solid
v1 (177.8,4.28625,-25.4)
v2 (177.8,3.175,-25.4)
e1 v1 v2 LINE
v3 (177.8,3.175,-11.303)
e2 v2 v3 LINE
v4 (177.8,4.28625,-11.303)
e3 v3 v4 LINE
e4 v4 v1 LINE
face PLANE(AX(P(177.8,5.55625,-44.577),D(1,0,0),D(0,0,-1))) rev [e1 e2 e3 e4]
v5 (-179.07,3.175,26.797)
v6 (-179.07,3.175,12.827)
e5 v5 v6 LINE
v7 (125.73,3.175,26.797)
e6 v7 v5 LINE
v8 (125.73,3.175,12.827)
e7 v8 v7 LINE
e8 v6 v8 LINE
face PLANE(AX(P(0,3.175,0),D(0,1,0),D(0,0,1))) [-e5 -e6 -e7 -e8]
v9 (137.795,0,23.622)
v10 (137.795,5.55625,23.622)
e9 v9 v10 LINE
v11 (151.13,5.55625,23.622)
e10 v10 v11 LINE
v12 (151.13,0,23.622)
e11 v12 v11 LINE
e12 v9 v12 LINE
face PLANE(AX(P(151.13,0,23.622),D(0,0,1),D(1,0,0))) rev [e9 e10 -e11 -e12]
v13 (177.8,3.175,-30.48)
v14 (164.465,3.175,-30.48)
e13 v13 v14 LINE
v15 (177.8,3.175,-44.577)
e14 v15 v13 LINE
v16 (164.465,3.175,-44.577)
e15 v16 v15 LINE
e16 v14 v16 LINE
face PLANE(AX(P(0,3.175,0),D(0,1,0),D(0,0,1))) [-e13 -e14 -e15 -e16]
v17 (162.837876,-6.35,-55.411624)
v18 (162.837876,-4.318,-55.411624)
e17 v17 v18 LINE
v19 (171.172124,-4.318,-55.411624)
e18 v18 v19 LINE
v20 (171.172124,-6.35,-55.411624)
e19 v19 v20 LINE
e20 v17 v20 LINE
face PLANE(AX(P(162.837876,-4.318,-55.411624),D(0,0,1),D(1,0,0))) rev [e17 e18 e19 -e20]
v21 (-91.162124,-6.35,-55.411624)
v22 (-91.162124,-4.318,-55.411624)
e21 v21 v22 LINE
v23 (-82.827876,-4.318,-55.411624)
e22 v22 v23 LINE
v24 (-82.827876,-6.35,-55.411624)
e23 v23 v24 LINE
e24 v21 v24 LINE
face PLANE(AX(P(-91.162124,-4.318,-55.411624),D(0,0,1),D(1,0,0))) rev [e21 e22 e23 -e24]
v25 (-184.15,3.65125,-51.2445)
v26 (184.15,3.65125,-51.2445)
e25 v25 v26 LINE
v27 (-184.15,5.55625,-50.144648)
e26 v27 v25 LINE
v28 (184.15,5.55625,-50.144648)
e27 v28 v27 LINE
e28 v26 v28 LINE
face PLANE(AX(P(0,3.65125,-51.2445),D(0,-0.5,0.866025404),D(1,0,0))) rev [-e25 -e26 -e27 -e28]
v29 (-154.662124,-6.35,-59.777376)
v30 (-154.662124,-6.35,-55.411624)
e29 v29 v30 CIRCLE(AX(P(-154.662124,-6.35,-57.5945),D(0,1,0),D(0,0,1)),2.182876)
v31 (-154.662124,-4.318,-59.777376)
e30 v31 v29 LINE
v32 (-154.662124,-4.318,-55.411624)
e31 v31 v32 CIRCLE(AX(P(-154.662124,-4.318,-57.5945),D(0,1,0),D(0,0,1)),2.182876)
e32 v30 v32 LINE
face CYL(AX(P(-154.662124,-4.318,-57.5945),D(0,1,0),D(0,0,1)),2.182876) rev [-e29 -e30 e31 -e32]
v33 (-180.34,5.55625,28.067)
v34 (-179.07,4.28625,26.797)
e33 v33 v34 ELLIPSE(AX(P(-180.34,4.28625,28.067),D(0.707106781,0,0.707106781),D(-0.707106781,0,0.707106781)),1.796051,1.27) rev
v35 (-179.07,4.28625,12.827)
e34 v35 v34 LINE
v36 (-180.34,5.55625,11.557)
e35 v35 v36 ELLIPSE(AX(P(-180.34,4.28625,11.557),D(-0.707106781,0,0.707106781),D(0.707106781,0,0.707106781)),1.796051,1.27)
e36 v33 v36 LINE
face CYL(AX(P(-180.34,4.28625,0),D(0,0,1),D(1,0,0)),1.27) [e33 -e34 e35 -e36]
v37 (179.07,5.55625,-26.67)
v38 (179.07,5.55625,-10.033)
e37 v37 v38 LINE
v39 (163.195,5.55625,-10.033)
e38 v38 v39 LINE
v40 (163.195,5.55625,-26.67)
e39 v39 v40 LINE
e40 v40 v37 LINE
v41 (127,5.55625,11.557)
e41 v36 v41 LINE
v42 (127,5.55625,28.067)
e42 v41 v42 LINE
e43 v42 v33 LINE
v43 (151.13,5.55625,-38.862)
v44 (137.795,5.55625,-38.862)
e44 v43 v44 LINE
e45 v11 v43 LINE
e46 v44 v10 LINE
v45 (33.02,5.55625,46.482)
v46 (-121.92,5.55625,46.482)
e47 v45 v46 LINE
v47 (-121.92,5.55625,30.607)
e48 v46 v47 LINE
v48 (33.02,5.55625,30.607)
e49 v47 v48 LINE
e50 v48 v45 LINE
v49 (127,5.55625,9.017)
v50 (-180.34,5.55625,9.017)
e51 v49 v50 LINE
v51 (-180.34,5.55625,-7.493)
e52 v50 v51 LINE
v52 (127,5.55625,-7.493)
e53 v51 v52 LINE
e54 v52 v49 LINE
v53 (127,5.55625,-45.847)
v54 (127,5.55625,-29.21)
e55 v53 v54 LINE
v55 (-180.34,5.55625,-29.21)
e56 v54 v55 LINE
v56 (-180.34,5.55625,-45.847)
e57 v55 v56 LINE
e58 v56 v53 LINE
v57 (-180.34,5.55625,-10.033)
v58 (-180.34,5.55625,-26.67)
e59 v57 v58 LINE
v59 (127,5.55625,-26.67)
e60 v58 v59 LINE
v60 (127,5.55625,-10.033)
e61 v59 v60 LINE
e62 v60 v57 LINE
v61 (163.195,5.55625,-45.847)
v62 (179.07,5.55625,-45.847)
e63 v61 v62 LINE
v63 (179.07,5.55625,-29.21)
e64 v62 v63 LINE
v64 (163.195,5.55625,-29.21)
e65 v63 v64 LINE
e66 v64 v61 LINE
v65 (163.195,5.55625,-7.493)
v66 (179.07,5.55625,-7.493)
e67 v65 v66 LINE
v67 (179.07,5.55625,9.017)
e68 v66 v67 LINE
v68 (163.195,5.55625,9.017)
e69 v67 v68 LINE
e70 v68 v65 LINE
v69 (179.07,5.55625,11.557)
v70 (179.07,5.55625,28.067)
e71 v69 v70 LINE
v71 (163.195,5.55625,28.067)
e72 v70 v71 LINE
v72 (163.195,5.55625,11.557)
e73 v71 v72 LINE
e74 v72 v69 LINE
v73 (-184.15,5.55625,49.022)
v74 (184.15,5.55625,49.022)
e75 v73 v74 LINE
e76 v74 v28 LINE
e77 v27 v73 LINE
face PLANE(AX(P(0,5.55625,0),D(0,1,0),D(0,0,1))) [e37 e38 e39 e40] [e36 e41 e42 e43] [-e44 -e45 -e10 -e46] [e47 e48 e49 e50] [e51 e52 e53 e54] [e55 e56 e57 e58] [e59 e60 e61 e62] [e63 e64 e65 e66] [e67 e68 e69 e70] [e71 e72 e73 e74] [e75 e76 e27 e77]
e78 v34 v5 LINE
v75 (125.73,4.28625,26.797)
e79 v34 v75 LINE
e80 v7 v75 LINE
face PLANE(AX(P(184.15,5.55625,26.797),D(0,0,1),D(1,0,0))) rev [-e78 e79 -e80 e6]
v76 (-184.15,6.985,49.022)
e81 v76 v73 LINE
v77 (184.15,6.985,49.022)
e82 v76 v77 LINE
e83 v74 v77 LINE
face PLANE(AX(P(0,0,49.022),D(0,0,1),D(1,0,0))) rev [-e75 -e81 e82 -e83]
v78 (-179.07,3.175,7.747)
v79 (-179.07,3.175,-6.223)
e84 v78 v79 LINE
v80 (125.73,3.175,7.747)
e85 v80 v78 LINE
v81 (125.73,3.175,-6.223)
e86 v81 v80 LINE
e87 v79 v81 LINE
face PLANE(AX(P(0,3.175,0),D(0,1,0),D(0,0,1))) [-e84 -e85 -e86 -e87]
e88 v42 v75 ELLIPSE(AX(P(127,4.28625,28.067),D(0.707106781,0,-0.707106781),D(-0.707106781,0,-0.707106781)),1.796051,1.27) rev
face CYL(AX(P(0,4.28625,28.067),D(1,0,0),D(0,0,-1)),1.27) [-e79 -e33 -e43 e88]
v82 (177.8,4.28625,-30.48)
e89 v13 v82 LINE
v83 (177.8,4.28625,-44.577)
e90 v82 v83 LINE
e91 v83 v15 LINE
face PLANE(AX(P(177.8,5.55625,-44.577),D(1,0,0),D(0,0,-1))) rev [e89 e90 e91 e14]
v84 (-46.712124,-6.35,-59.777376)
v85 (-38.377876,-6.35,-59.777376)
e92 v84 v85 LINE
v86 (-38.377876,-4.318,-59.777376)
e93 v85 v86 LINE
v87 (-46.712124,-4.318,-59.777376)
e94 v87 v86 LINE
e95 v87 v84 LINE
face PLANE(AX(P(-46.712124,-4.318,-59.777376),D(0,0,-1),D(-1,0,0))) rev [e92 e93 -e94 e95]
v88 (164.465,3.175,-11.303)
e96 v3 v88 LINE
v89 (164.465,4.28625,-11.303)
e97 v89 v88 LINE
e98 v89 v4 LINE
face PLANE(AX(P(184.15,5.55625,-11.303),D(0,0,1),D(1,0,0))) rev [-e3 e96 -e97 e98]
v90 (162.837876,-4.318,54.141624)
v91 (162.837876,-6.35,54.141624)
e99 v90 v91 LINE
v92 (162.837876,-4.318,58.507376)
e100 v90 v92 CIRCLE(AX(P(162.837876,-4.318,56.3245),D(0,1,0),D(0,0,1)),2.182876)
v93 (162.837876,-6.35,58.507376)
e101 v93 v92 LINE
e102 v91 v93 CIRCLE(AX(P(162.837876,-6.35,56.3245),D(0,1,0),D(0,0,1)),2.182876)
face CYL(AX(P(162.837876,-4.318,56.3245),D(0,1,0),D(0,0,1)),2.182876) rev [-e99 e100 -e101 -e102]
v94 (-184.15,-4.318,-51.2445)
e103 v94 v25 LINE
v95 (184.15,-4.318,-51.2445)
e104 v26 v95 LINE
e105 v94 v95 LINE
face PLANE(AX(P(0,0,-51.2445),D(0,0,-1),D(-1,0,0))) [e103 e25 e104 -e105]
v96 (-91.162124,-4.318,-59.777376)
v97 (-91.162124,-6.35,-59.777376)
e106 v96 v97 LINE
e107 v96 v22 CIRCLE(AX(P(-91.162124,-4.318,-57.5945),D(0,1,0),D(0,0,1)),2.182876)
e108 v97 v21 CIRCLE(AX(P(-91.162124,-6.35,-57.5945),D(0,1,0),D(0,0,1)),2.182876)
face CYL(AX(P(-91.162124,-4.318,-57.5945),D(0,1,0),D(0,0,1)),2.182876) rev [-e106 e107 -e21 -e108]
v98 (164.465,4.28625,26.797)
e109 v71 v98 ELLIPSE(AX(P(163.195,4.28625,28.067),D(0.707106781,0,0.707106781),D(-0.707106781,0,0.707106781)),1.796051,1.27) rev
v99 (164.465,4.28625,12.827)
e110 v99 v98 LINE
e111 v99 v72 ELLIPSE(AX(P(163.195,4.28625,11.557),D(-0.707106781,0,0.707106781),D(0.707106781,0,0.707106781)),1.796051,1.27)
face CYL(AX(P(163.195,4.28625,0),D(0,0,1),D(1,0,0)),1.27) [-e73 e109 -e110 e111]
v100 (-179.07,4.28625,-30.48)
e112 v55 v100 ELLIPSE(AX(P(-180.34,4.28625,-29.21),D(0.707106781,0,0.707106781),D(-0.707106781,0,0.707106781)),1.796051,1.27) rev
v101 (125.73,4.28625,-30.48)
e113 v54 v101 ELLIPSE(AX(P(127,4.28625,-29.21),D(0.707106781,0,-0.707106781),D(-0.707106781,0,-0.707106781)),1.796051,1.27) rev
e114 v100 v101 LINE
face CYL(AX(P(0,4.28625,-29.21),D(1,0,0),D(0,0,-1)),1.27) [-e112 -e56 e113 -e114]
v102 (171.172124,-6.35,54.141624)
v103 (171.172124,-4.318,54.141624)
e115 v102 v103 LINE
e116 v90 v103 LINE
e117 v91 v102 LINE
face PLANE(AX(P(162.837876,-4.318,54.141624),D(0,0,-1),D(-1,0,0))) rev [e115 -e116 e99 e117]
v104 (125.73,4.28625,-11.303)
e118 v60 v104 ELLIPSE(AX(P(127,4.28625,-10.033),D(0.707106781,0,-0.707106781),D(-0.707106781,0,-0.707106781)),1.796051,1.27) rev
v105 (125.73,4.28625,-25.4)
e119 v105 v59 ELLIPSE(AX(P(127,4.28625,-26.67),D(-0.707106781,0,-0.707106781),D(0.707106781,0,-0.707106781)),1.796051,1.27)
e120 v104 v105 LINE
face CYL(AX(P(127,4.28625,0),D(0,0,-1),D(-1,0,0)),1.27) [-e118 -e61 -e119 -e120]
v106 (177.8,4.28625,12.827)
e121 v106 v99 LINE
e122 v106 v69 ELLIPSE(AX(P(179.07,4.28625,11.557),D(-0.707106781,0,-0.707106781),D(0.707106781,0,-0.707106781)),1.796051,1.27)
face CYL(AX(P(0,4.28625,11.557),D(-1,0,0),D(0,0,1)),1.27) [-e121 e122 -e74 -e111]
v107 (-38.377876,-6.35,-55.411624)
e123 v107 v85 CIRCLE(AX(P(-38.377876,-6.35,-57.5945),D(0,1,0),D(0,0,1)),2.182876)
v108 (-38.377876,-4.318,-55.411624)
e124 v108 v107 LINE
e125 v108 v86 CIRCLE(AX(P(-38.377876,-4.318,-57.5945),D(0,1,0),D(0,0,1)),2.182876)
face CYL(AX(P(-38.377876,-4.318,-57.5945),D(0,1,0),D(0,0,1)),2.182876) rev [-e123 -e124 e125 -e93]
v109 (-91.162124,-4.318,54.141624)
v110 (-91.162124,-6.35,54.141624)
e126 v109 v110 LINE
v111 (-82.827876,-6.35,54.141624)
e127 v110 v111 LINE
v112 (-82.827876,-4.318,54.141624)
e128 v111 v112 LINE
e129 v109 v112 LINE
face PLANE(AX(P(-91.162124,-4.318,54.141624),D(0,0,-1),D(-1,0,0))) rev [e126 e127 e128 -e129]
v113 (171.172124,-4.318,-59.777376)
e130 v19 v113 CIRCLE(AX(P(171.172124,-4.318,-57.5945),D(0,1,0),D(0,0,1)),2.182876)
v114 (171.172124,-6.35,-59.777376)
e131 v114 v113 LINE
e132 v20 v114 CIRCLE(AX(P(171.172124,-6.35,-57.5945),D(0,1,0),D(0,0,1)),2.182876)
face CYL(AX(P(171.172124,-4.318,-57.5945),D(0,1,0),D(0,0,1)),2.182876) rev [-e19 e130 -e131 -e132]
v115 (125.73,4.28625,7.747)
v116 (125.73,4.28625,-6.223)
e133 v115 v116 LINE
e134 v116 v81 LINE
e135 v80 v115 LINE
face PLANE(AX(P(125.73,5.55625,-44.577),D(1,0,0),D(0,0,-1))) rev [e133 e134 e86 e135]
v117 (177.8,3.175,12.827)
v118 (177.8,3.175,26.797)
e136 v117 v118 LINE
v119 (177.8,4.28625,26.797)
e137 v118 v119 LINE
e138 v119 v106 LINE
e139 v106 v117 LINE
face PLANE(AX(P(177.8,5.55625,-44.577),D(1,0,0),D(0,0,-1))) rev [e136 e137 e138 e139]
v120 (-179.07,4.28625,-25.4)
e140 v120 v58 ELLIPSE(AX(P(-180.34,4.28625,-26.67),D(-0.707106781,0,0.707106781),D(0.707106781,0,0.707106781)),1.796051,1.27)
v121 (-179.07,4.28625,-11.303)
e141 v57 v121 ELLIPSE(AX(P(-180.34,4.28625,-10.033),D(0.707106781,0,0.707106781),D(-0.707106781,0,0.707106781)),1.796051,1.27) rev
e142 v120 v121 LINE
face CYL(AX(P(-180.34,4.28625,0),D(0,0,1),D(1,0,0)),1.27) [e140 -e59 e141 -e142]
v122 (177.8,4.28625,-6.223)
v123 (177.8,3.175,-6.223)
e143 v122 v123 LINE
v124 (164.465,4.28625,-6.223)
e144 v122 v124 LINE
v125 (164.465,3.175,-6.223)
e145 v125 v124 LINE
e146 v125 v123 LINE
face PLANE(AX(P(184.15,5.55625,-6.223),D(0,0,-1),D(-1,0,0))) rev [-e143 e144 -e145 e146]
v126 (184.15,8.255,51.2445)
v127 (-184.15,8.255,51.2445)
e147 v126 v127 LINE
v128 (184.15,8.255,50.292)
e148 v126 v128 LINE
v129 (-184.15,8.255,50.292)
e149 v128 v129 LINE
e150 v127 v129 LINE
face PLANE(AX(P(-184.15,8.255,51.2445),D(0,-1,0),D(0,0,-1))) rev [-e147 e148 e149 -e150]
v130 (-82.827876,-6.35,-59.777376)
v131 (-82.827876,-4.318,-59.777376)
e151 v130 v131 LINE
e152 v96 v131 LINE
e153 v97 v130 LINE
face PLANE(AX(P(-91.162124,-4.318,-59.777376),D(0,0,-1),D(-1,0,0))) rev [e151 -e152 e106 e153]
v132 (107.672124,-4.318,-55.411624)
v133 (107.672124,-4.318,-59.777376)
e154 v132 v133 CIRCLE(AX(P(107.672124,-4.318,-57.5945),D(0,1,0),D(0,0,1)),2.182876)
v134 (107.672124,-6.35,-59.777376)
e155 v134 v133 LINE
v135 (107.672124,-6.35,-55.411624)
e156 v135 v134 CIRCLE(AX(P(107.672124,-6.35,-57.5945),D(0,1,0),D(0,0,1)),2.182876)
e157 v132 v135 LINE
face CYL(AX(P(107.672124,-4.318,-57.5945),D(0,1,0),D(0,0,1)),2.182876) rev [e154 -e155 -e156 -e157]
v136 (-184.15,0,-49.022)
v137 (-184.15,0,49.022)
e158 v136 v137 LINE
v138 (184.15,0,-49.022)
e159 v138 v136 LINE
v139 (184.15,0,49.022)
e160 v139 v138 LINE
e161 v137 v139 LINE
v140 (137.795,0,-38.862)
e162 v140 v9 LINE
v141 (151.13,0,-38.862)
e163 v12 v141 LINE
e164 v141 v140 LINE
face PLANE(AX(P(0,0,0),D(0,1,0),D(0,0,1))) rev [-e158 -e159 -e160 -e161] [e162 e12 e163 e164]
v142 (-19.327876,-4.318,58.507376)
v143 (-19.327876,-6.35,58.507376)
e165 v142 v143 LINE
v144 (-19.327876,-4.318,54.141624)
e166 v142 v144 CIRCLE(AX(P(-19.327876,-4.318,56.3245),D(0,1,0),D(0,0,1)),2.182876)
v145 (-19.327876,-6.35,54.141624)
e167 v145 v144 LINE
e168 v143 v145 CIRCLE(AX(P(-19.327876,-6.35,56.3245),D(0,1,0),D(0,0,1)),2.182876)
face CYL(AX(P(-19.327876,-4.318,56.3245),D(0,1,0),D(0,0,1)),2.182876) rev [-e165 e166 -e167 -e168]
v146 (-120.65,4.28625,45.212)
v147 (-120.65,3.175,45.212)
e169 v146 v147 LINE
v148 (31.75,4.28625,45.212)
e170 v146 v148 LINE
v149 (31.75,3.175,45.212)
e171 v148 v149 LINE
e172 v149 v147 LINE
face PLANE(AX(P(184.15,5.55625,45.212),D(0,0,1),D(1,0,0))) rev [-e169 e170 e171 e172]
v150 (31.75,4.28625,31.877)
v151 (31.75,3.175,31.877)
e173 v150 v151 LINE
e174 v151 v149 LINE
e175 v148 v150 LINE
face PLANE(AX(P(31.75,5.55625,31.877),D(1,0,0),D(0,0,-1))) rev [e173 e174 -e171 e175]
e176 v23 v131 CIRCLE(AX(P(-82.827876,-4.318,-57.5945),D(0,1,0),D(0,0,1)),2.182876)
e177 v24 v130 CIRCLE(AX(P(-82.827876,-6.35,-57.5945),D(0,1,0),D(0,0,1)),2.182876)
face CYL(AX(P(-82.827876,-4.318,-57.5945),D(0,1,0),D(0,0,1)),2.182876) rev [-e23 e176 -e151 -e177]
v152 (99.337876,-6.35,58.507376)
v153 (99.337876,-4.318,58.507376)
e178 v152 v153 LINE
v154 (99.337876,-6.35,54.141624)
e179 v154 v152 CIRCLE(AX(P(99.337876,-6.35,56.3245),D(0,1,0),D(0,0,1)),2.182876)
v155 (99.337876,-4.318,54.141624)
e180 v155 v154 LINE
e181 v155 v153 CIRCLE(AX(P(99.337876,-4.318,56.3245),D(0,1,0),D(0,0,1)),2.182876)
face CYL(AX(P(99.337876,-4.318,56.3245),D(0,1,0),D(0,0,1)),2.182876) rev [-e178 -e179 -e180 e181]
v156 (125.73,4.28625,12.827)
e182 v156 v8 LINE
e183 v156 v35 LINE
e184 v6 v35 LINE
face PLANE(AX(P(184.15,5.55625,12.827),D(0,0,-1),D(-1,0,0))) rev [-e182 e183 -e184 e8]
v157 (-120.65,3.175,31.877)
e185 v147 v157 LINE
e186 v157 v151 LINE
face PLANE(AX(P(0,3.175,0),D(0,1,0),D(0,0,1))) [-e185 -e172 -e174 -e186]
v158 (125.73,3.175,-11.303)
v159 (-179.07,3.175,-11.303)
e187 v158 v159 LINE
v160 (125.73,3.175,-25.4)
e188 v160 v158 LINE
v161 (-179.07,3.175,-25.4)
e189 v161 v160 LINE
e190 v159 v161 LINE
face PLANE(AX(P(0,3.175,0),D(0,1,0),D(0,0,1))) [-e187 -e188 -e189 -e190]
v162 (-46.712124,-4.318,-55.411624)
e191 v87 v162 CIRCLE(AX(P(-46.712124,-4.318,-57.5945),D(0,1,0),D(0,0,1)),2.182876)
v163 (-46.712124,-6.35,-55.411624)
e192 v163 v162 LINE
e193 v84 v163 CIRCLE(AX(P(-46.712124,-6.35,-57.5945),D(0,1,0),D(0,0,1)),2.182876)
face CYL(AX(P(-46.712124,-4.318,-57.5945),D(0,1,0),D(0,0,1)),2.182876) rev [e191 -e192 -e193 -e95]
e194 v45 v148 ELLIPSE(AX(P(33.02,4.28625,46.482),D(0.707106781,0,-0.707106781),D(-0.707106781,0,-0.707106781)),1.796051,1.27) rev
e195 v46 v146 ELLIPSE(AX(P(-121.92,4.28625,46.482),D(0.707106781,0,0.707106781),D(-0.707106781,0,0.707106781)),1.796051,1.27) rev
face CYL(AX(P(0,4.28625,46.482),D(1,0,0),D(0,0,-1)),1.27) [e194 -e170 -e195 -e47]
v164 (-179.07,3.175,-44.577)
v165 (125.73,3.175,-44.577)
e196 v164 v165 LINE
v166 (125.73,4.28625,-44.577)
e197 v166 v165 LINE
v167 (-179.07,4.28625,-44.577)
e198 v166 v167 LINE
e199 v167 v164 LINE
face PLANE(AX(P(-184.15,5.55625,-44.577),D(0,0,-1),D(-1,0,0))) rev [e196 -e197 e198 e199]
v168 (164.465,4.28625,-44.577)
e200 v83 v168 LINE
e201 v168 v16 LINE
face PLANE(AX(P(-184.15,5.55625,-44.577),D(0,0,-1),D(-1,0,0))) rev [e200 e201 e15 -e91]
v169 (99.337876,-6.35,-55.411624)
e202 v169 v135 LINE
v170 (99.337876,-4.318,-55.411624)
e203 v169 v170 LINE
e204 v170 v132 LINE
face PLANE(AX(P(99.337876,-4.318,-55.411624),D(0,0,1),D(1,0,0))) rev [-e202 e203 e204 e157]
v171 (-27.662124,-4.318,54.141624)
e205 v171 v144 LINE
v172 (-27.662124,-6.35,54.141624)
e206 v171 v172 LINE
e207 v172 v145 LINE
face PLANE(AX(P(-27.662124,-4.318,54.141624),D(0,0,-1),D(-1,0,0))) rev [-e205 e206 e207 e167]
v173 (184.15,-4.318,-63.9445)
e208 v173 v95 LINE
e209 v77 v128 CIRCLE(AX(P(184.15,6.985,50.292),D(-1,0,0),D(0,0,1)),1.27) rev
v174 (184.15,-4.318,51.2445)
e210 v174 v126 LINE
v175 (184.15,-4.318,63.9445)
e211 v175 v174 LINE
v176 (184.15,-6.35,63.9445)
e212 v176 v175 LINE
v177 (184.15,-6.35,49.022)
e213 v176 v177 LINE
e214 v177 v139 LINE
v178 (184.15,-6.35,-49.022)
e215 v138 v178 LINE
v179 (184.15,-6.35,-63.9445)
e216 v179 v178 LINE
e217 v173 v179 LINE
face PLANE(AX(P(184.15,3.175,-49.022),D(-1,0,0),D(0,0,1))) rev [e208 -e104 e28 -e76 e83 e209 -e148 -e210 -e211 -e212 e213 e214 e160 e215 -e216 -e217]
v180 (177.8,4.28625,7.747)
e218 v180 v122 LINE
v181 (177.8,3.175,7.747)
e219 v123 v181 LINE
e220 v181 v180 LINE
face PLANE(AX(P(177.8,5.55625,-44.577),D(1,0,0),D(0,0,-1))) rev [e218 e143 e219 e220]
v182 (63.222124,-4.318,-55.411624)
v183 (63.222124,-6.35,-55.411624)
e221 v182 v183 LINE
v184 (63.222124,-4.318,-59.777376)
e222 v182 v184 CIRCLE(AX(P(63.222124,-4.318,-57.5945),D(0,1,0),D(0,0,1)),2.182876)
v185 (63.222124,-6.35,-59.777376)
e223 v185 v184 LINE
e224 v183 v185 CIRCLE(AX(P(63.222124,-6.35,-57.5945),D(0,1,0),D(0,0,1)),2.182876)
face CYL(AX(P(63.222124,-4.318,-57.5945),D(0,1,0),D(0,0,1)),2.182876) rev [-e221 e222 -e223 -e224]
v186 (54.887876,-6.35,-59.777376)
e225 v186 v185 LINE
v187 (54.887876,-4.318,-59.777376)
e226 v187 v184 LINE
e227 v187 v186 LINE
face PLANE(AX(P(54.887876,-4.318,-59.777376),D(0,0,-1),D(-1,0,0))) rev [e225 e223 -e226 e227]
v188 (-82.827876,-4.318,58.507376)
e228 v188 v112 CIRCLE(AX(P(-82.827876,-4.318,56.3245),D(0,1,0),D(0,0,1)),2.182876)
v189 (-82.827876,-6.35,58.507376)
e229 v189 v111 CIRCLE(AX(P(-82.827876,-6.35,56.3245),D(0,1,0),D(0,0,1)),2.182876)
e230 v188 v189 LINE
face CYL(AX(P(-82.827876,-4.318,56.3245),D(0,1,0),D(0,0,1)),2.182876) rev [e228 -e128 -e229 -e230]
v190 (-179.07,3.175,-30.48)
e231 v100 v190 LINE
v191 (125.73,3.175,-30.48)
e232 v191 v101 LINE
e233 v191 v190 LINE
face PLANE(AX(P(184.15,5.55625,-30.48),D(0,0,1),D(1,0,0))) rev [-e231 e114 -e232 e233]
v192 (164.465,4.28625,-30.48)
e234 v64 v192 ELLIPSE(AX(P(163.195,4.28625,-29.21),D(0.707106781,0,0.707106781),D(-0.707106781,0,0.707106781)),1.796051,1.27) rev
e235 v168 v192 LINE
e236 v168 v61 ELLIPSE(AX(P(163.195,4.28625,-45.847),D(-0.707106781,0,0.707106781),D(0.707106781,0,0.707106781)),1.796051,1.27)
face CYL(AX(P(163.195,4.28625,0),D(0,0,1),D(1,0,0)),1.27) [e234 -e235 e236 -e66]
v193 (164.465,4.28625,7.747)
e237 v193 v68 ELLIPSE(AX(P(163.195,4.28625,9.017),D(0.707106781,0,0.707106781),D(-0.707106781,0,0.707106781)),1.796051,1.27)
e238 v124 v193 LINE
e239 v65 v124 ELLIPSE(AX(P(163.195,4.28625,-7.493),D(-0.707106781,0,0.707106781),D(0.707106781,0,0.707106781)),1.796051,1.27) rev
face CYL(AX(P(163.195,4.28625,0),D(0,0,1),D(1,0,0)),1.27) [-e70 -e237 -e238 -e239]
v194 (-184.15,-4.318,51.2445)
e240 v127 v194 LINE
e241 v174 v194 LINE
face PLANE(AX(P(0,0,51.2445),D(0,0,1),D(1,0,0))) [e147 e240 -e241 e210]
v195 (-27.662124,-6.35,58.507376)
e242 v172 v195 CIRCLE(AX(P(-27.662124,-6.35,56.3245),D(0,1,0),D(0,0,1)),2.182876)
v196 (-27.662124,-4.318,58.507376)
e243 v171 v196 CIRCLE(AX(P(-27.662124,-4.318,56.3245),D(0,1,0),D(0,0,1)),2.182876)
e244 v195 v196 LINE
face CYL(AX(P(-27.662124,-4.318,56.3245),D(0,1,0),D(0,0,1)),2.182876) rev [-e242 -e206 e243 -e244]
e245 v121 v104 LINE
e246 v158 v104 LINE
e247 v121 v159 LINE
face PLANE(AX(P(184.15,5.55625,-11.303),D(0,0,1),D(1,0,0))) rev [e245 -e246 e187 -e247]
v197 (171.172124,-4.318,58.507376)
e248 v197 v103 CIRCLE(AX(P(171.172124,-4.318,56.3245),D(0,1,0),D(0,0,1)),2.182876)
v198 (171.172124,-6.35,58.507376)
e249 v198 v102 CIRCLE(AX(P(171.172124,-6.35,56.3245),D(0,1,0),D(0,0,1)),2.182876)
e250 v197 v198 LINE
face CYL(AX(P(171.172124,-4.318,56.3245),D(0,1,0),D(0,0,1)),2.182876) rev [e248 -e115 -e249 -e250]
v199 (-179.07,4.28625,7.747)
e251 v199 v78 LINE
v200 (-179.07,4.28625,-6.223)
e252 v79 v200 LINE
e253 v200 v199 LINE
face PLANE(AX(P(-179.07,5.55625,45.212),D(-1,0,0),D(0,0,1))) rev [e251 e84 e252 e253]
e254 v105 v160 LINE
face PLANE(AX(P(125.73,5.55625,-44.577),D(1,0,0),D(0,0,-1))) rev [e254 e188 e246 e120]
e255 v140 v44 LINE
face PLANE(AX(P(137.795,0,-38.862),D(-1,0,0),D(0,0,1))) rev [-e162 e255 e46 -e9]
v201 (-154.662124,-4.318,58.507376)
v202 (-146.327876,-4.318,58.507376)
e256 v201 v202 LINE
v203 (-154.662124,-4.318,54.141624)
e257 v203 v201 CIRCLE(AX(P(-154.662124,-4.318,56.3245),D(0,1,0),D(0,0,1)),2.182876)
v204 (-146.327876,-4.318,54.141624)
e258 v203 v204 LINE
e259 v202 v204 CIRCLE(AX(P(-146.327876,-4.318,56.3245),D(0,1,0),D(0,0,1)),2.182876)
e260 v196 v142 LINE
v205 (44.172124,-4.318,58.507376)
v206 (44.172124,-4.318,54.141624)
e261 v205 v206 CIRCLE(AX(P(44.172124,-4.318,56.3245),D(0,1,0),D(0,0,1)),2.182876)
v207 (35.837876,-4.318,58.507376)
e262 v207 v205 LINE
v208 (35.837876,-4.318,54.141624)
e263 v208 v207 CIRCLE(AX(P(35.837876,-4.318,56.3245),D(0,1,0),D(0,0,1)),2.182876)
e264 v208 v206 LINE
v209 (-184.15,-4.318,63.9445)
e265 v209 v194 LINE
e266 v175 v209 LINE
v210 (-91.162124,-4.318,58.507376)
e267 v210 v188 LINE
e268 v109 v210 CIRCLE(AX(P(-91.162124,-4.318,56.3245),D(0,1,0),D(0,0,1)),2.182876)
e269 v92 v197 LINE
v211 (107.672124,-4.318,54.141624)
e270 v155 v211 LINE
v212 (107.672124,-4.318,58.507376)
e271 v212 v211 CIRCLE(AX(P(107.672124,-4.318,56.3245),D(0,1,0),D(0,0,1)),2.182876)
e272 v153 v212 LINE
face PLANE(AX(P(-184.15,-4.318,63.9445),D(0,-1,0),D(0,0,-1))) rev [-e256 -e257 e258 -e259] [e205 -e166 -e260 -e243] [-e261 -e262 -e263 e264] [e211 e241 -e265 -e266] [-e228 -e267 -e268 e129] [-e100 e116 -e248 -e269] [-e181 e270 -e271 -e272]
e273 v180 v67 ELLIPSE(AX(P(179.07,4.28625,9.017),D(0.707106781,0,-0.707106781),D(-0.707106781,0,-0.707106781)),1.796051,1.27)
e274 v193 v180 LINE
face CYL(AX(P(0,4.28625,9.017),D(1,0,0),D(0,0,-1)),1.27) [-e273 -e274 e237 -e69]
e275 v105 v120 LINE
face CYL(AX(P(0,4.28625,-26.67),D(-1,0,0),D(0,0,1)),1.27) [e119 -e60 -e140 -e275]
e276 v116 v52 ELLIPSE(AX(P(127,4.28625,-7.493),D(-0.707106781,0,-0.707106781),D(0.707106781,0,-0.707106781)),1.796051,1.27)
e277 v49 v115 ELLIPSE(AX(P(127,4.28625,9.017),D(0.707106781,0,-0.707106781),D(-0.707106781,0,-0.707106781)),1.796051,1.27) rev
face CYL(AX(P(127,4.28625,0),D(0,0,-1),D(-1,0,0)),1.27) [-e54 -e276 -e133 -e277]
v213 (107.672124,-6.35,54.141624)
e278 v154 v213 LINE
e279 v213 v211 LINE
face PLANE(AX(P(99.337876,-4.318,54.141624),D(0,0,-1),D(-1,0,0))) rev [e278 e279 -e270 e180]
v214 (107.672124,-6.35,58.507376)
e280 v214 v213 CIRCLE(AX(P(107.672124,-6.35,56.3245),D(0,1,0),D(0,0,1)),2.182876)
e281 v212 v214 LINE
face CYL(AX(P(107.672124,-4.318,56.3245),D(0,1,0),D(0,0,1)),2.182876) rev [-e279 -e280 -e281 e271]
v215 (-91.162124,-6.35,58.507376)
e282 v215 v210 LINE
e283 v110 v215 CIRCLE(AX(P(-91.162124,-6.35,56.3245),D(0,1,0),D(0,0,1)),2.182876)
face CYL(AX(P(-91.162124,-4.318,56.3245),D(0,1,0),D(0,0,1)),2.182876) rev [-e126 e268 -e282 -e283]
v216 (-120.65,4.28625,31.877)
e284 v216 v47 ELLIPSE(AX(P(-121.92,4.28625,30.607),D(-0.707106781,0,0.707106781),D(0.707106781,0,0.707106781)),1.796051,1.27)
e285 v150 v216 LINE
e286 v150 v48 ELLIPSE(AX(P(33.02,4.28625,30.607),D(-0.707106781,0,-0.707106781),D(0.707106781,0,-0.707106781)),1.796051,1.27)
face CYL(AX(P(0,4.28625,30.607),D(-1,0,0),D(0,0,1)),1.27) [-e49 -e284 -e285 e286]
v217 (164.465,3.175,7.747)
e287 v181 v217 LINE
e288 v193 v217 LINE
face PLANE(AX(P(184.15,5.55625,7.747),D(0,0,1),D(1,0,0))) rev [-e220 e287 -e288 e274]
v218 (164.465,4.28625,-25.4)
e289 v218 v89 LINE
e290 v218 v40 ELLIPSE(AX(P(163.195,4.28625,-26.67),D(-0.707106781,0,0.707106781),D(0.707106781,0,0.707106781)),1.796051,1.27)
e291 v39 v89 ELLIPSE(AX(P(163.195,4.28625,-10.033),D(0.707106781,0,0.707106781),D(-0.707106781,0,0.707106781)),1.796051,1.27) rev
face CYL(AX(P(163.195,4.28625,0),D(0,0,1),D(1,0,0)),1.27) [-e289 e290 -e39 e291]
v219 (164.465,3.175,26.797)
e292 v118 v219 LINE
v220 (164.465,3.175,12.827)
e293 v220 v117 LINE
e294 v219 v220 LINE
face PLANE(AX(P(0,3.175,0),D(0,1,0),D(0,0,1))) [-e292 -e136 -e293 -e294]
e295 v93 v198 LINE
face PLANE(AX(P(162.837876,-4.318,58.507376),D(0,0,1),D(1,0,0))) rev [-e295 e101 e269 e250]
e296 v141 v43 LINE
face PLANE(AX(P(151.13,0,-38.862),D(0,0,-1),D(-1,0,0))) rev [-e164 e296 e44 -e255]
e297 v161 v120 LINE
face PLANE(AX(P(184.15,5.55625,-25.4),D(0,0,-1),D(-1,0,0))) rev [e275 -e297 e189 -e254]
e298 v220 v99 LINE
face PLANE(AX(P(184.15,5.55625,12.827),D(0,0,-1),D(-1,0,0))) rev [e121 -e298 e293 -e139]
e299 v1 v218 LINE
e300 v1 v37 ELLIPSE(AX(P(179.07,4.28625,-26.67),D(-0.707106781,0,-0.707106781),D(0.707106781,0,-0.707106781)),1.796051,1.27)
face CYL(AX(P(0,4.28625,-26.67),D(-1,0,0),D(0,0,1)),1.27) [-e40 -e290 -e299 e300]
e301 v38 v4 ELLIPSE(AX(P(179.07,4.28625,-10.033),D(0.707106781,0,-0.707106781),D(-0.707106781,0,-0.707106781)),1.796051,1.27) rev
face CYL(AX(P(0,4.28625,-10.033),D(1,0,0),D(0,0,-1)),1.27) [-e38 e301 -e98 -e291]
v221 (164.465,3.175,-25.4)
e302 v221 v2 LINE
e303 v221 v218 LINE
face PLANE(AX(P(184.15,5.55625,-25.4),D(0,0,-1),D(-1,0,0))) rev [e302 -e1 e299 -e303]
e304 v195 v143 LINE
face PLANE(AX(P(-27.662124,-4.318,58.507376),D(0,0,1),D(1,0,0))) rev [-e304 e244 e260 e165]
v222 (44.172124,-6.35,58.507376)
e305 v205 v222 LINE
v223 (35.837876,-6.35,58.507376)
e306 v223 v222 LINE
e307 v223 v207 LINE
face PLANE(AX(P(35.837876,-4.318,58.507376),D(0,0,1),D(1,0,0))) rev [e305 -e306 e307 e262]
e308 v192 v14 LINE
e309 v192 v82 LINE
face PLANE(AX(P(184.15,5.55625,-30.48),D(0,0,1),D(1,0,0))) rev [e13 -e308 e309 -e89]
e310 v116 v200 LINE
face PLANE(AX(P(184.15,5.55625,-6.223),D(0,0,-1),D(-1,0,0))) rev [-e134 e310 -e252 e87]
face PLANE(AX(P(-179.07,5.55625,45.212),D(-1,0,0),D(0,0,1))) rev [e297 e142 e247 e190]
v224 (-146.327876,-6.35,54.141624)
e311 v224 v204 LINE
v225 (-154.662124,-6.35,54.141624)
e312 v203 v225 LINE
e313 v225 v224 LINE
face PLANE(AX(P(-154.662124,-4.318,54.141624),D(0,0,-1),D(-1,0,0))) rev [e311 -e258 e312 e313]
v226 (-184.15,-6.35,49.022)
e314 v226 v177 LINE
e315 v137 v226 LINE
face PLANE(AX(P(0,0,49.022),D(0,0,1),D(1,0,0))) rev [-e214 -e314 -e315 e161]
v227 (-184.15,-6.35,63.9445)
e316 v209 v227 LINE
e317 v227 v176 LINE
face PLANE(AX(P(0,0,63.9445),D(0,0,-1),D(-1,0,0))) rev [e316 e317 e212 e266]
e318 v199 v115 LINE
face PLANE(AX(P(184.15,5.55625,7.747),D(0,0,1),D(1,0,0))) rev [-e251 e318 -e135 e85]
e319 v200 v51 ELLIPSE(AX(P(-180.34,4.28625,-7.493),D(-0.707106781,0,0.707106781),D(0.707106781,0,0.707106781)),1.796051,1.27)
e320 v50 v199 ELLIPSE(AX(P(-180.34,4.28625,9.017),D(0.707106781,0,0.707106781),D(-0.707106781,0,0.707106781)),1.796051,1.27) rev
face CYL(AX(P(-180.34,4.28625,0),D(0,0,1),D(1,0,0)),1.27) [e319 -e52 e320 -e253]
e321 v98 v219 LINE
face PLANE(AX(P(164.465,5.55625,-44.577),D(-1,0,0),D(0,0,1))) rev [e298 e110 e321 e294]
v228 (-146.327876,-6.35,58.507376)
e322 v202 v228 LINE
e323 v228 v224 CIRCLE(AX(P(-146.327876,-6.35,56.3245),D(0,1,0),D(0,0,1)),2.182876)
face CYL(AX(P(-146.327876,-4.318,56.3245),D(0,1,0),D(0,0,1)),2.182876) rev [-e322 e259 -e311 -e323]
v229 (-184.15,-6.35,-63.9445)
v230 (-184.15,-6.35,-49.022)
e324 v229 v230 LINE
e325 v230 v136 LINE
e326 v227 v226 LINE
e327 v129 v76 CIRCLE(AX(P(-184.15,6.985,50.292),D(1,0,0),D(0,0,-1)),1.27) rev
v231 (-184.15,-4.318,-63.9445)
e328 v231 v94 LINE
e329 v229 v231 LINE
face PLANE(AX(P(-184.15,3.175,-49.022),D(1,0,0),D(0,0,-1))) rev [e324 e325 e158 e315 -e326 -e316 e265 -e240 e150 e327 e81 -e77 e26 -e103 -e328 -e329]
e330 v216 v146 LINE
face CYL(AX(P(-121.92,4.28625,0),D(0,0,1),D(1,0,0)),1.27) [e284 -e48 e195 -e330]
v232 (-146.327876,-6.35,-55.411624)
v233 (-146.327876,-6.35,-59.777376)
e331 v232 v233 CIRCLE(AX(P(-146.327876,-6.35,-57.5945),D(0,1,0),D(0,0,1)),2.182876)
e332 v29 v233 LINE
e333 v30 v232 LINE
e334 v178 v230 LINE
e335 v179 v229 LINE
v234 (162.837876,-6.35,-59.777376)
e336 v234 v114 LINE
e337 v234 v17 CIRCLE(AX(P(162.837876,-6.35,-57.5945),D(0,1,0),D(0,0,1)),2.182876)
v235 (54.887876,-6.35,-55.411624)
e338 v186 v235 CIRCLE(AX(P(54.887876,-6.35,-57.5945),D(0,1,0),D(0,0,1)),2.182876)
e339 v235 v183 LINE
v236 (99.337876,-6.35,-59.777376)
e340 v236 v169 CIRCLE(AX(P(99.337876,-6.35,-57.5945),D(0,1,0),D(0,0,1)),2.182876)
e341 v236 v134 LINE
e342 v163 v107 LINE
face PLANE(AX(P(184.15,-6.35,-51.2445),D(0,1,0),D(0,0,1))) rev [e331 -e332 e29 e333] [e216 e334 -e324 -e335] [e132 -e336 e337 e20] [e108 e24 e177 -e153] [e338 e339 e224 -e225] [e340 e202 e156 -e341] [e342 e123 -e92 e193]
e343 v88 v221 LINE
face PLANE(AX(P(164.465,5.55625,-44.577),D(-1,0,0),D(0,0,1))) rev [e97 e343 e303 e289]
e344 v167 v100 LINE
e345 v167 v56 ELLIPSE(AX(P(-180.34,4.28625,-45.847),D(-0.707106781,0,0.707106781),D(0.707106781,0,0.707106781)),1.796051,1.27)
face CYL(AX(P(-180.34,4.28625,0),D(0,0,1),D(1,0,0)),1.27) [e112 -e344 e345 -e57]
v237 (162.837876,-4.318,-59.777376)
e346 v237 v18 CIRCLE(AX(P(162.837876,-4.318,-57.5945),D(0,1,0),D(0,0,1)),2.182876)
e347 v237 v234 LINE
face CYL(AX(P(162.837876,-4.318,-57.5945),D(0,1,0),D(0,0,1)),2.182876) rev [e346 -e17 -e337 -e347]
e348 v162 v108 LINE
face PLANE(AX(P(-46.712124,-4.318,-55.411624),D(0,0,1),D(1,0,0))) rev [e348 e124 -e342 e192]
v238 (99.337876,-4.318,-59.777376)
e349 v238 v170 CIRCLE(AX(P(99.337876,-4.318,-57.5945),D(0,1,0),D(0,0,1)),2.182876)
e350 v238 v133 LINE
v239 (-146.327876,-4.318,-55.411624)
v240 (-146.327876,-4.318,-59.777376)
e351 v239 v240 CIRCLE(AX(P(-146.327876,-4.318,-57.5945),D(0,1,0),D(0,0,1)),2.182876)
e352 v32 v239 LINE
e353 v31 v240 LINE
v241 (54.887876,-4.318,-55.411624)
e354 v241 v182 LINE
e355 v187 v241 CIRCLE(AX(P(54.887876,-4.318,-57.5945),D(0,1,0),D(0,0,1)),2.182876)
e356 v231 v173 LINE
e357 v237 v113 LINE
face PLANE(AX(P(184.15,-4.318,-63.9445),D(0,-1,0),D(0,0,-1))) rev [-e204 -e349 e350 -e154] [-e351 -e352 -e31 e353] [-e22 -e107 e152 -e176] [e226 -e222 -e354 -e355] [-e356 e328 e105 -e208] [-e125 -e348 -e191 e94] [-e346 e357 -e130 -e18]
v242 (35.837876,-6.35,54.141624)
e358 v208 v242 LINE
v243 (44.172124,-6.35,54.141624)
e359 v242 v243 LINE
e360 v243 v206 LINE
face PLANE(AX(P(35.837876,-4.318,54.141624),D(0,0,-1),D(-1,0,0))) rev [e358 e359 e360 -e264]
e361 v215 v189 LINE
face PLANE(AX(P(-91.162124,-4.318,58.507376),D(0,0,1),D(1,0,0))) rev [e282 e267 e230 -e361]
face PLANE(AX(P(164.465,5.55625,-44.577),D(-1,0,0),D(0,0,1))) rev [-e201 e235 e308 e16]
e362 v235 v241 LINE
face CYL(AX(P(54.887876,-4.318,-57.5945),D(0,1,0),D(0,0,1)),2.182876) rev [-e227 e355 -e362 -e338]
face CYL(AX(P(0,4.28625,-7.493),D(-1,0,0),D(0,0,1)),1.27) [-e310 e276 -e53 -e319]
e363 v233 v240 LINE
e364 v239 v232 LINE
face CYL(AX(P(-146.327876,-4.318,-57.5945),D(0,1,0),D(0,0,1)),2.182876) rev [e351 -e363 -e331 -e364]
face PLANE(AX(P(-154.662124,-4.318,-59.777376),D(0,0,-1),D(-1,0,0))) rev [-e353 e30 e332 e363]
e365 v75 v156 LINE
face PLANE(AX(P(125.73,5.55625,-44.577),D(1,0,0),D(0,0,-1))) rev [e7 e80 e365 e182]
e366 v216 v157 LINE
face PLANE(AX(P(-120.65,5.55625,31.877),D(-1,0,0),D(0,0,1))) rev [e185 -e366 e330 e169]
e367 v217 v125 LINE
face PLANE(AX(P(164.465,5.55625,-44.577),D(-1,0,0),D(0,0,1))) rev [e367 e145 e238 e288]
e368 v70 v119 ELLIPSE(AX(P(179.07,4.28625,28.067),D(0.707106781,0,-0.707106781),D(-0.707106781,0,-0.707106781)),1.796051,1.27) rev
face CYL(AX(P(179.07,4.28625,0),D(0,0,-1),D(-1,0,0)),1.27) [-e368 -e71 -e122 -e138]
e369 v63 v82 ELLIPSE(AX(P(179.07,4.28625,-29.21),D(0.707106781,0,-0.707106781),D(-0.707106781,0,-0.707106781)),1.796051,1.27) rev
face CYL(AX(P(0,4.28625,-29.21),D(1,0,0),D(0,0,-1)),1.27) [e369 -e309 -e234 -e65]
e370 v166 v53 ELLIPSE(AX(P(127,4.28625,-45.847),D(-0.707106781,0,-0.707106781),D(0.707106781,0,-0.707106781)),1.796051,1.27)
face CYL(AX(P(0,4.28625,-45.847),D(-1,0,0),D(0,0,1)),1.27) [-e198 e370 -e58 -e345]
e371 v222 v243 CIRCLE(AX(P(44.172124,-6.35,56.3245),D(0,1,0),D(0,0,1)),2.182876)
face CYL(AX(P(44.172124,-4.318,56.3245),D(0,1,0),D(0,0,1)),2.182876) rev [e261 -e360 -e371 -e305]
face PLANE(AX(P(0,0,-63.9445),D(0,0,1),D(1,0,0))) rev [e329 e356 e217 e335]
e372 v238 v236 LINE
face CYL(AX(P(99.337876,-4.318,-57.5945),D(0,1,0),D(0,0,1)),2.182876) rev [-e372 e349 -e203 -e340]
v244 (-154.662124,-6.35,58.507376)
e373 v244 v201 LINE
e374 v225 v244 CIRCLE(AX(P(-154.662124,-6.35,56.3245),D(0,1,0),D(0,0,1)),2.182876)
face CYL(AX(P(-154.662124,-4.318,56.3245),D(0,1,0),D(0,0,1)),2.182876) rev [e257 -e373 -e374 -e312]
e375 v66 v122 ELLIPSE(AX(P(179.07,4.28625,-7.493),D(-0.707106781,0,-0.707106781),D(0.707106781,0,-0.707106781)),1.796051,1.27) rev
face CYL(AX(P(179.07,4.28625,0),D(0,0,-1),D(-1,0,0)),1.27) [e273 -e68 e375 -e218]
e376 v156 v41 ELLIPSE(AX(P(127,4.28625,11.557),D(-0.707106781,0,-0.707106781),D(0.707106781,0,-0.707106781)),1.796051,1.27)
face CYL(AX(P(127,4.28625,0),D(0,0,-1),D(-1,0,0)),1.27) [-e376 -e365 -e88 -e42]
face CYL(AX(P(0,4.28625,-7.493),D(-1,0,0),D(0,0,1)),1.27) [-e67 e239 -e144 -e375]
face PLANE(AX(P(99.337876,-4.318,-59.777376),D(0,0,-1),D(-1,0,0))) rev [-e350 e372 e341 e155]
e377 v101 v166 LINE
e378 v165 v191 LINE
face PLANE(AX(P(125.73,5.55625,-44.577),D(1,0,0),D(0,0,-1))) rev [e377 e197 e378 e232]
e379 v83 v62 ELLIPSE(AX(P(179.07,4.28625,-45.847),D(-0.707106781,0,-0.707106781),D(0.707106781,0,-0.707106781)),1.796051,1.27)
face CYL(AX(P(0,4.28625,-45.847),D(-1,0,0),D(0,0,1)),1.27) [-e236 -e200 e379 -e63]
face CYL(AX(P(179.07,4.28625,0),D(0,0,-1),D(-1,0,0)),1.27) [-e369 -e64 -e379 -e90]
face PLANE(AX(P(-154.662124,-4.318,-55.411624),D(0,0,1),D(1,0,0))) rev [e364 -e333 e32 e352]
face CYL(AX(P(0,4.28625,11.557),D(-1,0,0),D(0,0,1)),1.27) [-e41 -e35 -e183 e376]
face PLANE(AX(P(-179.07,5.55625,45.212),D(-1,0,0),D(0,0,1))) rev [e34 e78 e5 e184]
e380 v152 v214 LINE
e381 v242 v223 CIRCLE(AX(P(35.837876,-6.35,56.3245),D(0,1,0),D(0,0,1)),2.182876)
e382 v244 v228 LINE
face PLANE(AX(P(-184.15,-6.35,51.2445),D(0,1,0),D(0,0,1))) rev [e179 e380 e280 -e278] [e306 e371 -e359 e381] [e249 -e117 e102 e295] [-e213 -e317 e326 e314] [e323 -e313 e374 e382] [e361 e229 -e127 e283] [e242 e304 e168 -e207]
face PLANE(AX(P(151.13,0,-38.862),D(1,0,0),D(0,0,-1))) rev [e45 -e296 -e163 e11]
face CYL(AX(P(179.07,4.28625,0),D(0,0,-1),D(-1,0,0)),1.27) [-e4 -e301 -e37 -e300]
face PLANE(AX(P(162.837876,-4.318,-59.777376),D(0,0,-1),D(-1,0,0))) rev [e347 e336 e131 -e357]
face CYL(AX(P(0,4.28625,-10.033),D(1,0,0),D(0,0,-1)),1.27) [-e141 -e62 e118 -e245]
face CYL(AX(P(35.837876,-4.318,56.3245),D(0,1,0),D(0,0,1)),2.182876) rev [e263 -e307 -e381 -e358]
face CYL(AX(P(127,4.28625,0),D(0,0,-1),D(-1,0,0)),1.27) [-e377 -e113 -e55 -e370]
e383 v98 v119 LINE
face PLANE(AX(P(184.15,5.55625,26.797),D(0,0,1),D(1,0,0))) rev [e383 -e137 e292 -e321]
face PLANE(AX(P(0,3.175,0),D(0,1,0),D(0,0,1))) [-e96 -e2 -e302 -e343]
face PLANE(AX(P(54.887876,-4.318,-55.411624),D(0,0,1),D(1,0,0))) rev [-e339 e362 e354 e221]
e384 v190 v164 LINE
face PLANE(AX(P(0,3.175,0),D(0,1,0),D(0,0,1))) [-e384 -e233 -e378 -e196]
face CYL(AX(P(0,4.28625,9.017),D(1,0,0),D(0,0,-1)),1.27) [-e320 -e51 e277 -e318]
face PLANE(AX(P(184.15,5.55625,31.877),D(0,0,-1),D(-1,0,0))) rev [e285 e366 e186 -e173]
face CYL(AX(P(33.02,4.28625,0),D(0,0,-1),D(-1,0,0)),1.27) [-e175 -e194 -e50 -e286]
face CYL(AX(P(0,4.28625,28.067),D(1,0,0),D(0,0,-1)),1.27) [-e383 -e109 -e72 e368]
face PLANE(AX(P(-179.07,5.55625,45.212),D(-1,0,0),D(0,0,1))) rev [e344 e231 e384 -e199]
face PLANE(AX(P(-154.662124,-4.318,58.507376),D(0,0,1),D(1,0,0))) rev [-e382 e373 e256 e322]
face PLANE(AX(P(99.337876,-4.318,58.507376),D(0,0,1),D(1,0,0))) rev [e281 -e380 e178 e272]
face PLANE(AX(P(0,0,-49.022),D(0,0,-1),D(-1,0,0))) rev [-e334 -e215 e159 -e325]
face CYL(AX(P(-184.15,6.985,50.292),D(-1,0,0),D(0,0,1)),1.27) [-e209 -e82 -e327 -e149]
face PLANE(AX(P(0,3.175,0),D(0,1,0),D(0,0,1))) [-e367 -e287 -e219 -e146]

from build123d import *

# Parameters (mm, degrees)
SKETCH1_W                            = 368.3
SKETCH1_H                            = 98.044
BOSS_EXTRUDE1_DEPTH                  = 3.175
SKETCH2_W                            = 368.3
SKETCH2_H                            = 4.445
BOSS_EXTRUDE2_DEPTH                  = 2.38125
SKETCH3_W                            = 368.3
SKETCH3_H                            = 3.81
BOSS_EXTRUDE3_DEPTH                  = 2.38125
SKETCH4_W                            = 368.3
SKETCH4_H                            = 5.08
BOSS_EXTRUDE4_DEPTH                  = 2.38125
SKETCH5_W                            = 368.3
SKETCH5_H                            = 5.08
BOSS_EXTRUDE5_DEPTH                  = 2.38125
SKETCH7_W                            = 368.3
SKETCH7_H                            = 5.08
BOSS_EXTRUDE6_DEPTH                  = 2.38125
SKETCH9_W                            = 368.3
SKETCH9_H                            = 5.08
BOSS_EXTRUDE7_DEPTH                  = 2.38125
SKETCH10_W                           = 6.35
SKETCH10_H                           = 89.789
BOSS_EXTRUDE8_DEPTH                  = 2.38125
SKETCH11_W                           = 5.08
SKETCH11_H                           = 89.789
BOSS_EXTRUDE9_DEPTH                  = 2.38125
SKETCH12_W                           = 13.97
SKETCH12_H                           = 89.789
BOSS_EXTRUDE10_DEPTH                 = 2.38125
SKETCH13_W                           = 12.7
SKETCH13_H                           = 89.789
BOSS_EXTRUDE11_DEPTH                 = 2.38125
SKETCH14_W                           = 13.335
SKETCH14_H                           = 62.484
CUT_EXTRUDE1_DEPTH                   = 191.644304657
SKETCH15_W                           = 12.065
SKETCH15_H                           = 13.335
BOSS_EXTRUDE12_DEPTH                 = 2.38125
SKETCH16_W                           = 12.065
SKETCH16_H                           = 3.175
BOSS_EXTRUDE13_DEPTH                 = 2.38125
SKETCH17_W                           = 12.065
SKETCH17_H                           = 5.715
BOSS_EXTRUDE14_DEPTH                 = 2.38125
SKETCH18_W                           = 13.335
SKETCH18_H                           = 13.335
BOSS_EXTRUDE15_DEPTH                 = 2.38125
SKETCH19_W                           = 58.42
SKETCH19_H                           = 13.335
BOSS_EXTRUDE16_DEPTH                 = 2.38125
SKETCH20_W                           = 93.98
SKETCH20_H                           = 13.335
BOSS_EXTRUDE17_DEPTH                 = 2.38125
SKETCH22_W                           = 368.3
SKETCH22_H                           = 14.605
BOSS_EXTRUDE18_DEPTH                 = 2.2225
SKETCH23_W                           = 368.3
SKETCH23_H                           = 2.032
BOSS_EXTRUDE19_DEPTH                 = 12.7
SKETCH24_W                           = 368.3
SKETCH24_H                           = 11.90625
BOSS_EXTRUDE20_DEPTH                 = 2.2225
SKETCH25_W                           = 368.3
SKETCH25_H                           = 2.032
BOSS_EXTRUDE21_DEPTH                 = 12.7
F_11_64_START                        = -6.35
F_11_64_0_17188_DIAMETER_SLOT1_DEPTH = 2.032
FILLET2_R                            = 1.27
CHAMFER1_SIZE                        = 1.905
CHAMFER1_SIZE2                       = 1.099852263


# Read off the part's stored shape, not the designer's step: 11/64 (0.17188) Diameter Slot1
with BuildPart() as part:
    # Sketch1 → Boss-Extrude1 (new body)
    with BuildSketch(Plane(origin=(0, 0, 0), x_dir=(1, 0, 0), z_dir=(0, 1, 0))):
        Rectangle(SKETCH1_W, SKETCH1_H)
    extrude(amount=BOSS_EXTRUDE1_DEPTH)

    # Sketch2 → Boss-Extrude2 (add)
    with BuildSketch(Plane(origin=(0, 3.175, 0), x_dir=(1, 0, 0), z_dir=(0, 1, 0))):
        with Locations((0, 46.7995)):
            Rectangle(SKETCH2_W, SKETCH2_H)
    extrude(amount=BOSS_EXTRUDE2_DEPTH)

    # Sketch3 → Boss-Extrude3 (add)
    with BuildSketch(Plane(origin=(0, 3.175, 0), x_dir=(1, 0, 0), z_dir=(0, 1, 0))):
        with Locations((0, -47.117)):
            Rectangle(SKETCH3_W, SKETCH3_H)
    extrude(amount=BOSS_EXTRUDE3_DEPTH)

    # Sketch4 → Boss-Extrude4 (add)
    with BuildSketch(Plane(origin=(0, 3.175, 0), x_dir=(1, 0, 0), z_dir=(0, 1, 0))):
        with Locations((0, -29.337)):
            Rectangle(SKETCH4_W, SKETCH4_H)
    extrude(amount=BOSS_EXTRUDE4_DEPTH)

    # Sketch5 → Boss-Extrude5 (add)
    with BuildSketch(Plane(origin=(0, 3.175, 0), x_dir=(1, 0, 0), z_dir=(0, 1, 0))):
        with Locations((0, -10.287)):
            Rectangle(SKETCH5_W, SKETCH5_H)
    extrude(amount=BOSS_EXTRUDE5_DEPTH)

    # Sketch7 → Boss-Extrude6 (add)
    with BuildSketch(Plane(origin=(0, 3.175, 0), x_dir=(1, 0, 0), z_dir=(0, 1, 0))):
        with Locations((0, 8.763)):
            Rectangle(SKETCH7_W, SKETCH7_H)
    extrude(amount=BOSS_EXTRUDE6_DEPTH)

    # Sketch9 → Boss-Extrude7 (add)
    with BuildSketch(Plane(origin=(0, 3.175, 0), x_dir=(1, 0, 0), z_dir=(0, 1, 0))):
        with Locations((0, 27.94)):
            Rectangle(SKETCH9_W, SKETCH9_H)
    extrude(amount=BOSS_EXTRUDE7_DEPTH)

    # Sketch10 → Boss-Extrude8 (add)
    with BuildSketch(Plane(origin=(0, 3.175, 0), x_dir=(1, 0, 0), z_dir=(0, 1, 0))):
        with Locations((180.975, -0.3175)):
            Rectangle(SKETCH10_W, SKETCH10_H)
    extrude(amount=BOSS_EXTRUDE8_DEPTH)

    # Sketch11 → Boss-Extrude9 (add)
    with BuildSketch(Plane(origin=(0, 3.175, 0), x_dir=(1, 0, 0), z_dir=(0, 1, 0))):
        with Locations((-181.61, -0.3175)):
            Rectangle(SKETCH11_W, SKETCH11_H)
    extrude(amount=BOSS_EXTRUDE9_DEPTH)

    # Sketch12 → Boss-Extrude10 (add)
    with BuildSketch(Plane(origin=(0, 3.175, 0), x_dir=(1, 0, 0), z_dir=(0, 1, 0))):
        with Locations((157.48, -0.3175)):
            Rectangle(SKETCH12_W, SKETCH12_H)
    extrude(amount=BOSS_EXTRUDE10_DEPTH)

    # Sketch13 → Boss-Extrude11 (add)
    with BuildSketch(Plane(origin=(0, 3.175, 0), x_dir=(1, 0, 0), z_dir=(0, 1, 0))):
        with Locations((132.08, -0.3175)):
            Rectangle(SKETCH13_W, SKETCH13_H)
    extrude(amount=BOSS_EXTRUDE11_DEPTH)

    # Sketch14 → Cut-Extrude1 (cut, through all)
    with BuildSketch(Plane(origin=(0, 5.55625, 0), x_dir=(1, 0, 0), z_dir=(0, 1, 0))):
        with Locations((144.4625, 7.62)):
            Rectangle(SKETCH14_W, SKETCH14_H)
    extrude(amount=-CUT_EXTRUDE1_DEPTH, mode=Mode.SUBTRACT)

    # Sketch15 → Boss-Extrude12 (add)
    with BuildSketch(Plane(origin=(0, 3.175, 0), x_dir=(1, 0, 0), z_dir=(0, 1, 0))):
        with Locations((144.4625, -38.5445)):
            Rectangle(SKETCH15_W, SKETCH15_H)
    extrude(amount=BOSS_EXTRUDE12_DEPTH)

    # Sketch16 → Boss-Extrude13 (add)
    with BuildSketch(Plane(origin=(0, 3.175, 0), x_dir=(1, 0, 0), z_dir=(0, 1, 0))):
        with Locations((144.4625, -25.2095)):
            Rectangle(SKETCH16_W, SKETCH16_H)
    extrude(amount=BOSS_EXTRUDE13_DEPTH)

    # Sketch17 → Boss-Extrude14 (add)
    with BuildSketch(Plane(origin=(0, 3.175, 0), x_dir=(1, 0, 0), z_dir=(0, 1, 0))):
        with Locations((144.4625, 41.7195)):
            Rectangle(SKETCH17_W, SKETCH17_H)
    extrude(amount=BOSS_EXTRUDE14_DEPTH)

    # Sketch18 → Boss-Extrude15 (add)
    with BuildSketch(Plane(origin=(0, 3.175, 0), x_dir=(1, 0, 0), z_dir=(0, 1, 0))):
        with Locations((171.1325, -38.5445)):
            Rectangle(SKETCH18_W, SKETCH18_H)
    extrude(amount=BOSS_EXTRUDE15_DEPTH)

    # Sketch19 → Boss-Extrude16 (add)
    with BuildSketch(Plane(origin=(0, 3.175, 0), x_dir=(1, 0, 0), z_dir=(0, 1, 0))):
        with Locations((-149.86, -38.5445)):
            Rectangle(SKETCH19_W, SKETCH19_H)
    extrude(amount=BOSS_EXTRUDE16_DEPTH)

    # Sketch20 → Boss-Extrude17 (add)
    with BuildSketch(Plane(origin=(0, 3.175, 0), x_dir=(1, 0, 0), z_dir=(0, 1, 0))):
        with Locations((78.74, -38.5445)):
            Rectangle(SKETCH20_W, SKETCH20_H)
    extrude(amount=BOSS_EXTRUDE17_DEPTH)

    # Sketch22 → Boss-Extrude18 (add)
    with BuildSketch(Plane.XY.offset(49.022)):
        with Locations((0, 0.9525)):
            Rectangle(SKETCH22_W, SKETCH22_H)
    extrude(amount=BOSS_EXTRUDE18_DEPTH)

    # Sketch23 → Boss-Extrude19 (add)
    with BuildSketch(Plane.XY.offset(51.2445)):
        with Locations((0, -5.334)):
            Rectangle(SKETCH23_W, SKETCH23_H)
    extrude(amount=BOSS_EXTRUDE19_DEPTH)

    # Sketch24 → Boss-Extrude20 (add)
    with BuildSketch(Plane(origin=(0, 0, -49.022), x_dir=(-1, 0, 0), z_dir=(0, 0, -1))):
        with Locations((0, -0.396875)):
            Rectangle(SKETCH24_W, SKETCH24_H)
    extrude(amount=BOSS_EXTRUDE20_DEPTH)

    # Sketch25 → Boss-Extrude21 (add)
    with BuildSketch(Plane(origin=(0, 0, -51.2445), x_dir=(-1, 0, 0), z_dir=(0, 0, -1))):
        with Locations((0, -5.334)):
            Rectangle(SKETCH25_W, SKETCH25_H)
    extrude(amount=BOSS_EXTRUDE21_DEPTH)

    # 11/64 (0.17188) Diameter Slot1 outline → 11/64 (0.17188) Diameter Slot1 (cut)
    with BuildSketch(Plane(origin=(0, 0, 0), x_dir=(1, 0, 0), z_dir=(0, 1, 0)).offset(F_11_64_START)):
        with BuildLine():
            Line((-154.662124, -58.507376), (-146.327876, -58.507376))
            ThreePointArc((-146.327876, -58.507376), (-144.145, -56.3245), (-146.327876, -54.141624))
            Line((-146.327876, -54.141624), (-154.662124, -54.141624))
            ThreePointArc((-154.662124, -54.141624), (-156.845, -56.3245), (-154.662124, -58.507376))
        make_face()
        with BuildLine():
            ThreePointArc((-82.827876, -58.507376), (-80.645, -56.3245), (-82.827876, -54.141624))
            Line((-82.827876, -54.141624), (-91.162124, -54.141624))
            ThreePointArc((-91.162124, -54.141624), (-93.345, -56.3245), (-91.162124, -58.507376))
            Line((-91.162124, -58.507376), (-82.827876, -58.507376))
        make_face()
        with BuildLine():
            ThreePointArc((-19.327876, -58.507376), (-17.145, -56.3245), (-19.327876, -54.141624))
            Line((-19.327876, -54.141624), (-27.662124, -54.141624))
            ThreePointArc((-27.662124, -54.141624), (-29.845, -56.3245), (-27.662124, -58.507376))
            Line((-27.662124, -58.507376), (-19.327876, -58.507376))
        make_face()
        with BuildLine():
            ThreePointArc((44.172124, -58.50737603), (46.355, -56.32450003), (44.172124, -54.14162403))
            Line((44.172124, -54.14162403), (35.837876, -54.14162403))
            ThreePointArc((35.837876, -54.14162403), (33.655, -56.32450003), (35.837876, -58.50737603))
            Line((35.837876, -58.50737603), (44.172124, -58.50737603))
        make_face()
        with BuildLine():
            ThreePointArc((107.672124, -58.50737603), (109.855, -56.32450003), (107.672124, -54.14162403))
            Line((107.672124, -54.14162403), (99.337876, -54.14162403))
            ThreePointArc((99.337876, -54.14162403), (97.155, -56.32450003), (99.337876, -58.50737603))
            Line((99.337876, -58.50737603), (107.672124, -58.50737603))
        make_face()
        with BuildLine():
            ThreePointArc((171.172124, -58.507376), (173.355, -56.3245), (171.172124, -54.141624))
            Line((171.172124, -54.141624), (162.837876, -54.141624))
            ThreePointArc((162.837876, -54.141624), (160.655, -56.3245), (162.837876, -58.507376))
            Line((162.837876, -58.507376), (171.172124, -58.507376))
        make_face()
        with BuildLine():
            Line((-154.662124, 55.411624), (-146.327876, 55.411624))
            ThreePointArc((-146.327876, 55.411624), (-144.145, 57.5945), (-146.327876, 59.777376))
            Line((-146.327876, 59.777376), (-154.662124, 59.777376))
            ThreePointArc((-154.662124, 59.777376), (-156.845, 57.5945), (-154.662124, 55.411624))
        make_face()
        with BuildLine():
            ThreePointArc((-82.827876, 55.411624), (-80.645, 57.5945), (-82.827876, 59.777376))
            Line((-82.827876, 59.777376), (-91.162124, 59.777376))
            ThreePointArc((-91.162124, 59.777376), (-93.345, 57.5945), (-91.162124, 55.411624))
            Line((-91.162124, 55.411624), (-82.827876, 55.411624))
        make_face()
        with BuildLine():
            ThreePointArc((-38.377876, 55.411624), (-36.195, 57.5945), (-38.377876, 59.777376))
            Line((-38.377876, 59.777376), (-46.712124, 59.777376))
            ThreePointArc((-46.712124, 59.777376), (-48.895, 57.5945), (-46.712124, 55.411624))
            Line((-46.712124, 55.411624), (-38.377876, 55.411624))
        make_face()
        with BuildLine():
            ThreePointArc((63.222124, 55.411624), (65.405, 57.5945), (63.222124, 59.777376))
            Line((63.222124, 59.777376), (54.887876, 59.777376))
            ThreePointArc((54.887876, 59.777376), (52.705, 57.5945), (54.887876, 55.411624))
            Line((54.887876, 55.411624), (63.222124, 55.411624))
        make_face()
        with BuildLine():
            ThreePointArc((107.672124, 55.411624), (109.855, 57.5945), (107.672124, 59.777376))
            Line((107.672124, 59.777376), (99.337876, 59.777376))
            ThreePointArc((99.337876, 59.777376), (97.155, 57.5945), (99.337876, 55.411624))
            Line((99.337876, 55.411624), (107.672124, 55.411624))
        make_face()
        with BuildLine():
            ThreePointArc((171.172124, 55.411624), (173.355, 57.5945), (171.172124, 59.777376))
            Line((171.172124, 59.777376), (162.837876, 59.777376))
            ThreePointArc((162.837876, 59.777376), (160.655, 57.5945), (162.837876, 55.411624))
            Line((162.837876, 55.411624), (171.172124, 55.411624))
        make_face()
    extrude(amount=F_11_64_0_17188_DIAMETER_SLOT1_DEPTH, mode=Mode.SUBTRACT)

    # Fillet2
    fillet2_edges = [part.edges().sort_by_distance(p)[0] for p in [
        (177.8, 5.55625, 19.812),
        (177.8, 5.55625, 0.762),
        (177.8, 5.55625, -18.3515),
        (177.8, 5.55625, -37.5285),
        (-26.67, 5.55625, -44.577),
        (-26.67, 5.55625, -25.4),
        (-26.67, 5.55625, -6.223),
        (-26.67, 5.55625, 12.827),
        (-179.07, 5.55625, 19.812),
        (-179.07, 5.55625, 0.762),
        (-179.07, 5.55625, -18.3515),
        (-179.07, 5.55625, -37.5285),
        (171.1325, 5.55625, 12.827),
        (171.1325, 5.55625, -6.223),
        (171.1325, 5.55625, -25.4),
        (171.1325, 5.55625, -44.577),
        (164.465, 5.55625, 19.812),
        (164.465, 5.55625, 0.762),
        (164.465, 5.55625, -18.3515),
        (164.465, 5.55625, -37.5285),
        (-26.67, 5.55625, 26.797),
        (-26.67, 5.55625, 7.747),
        (-26.67, 5.55625, -11.303),
        (-26.67, 5.55625, -30.48),
        (125.73, 5.55625, 19.812),
        (125.73, 5.55625, 0.762),
        (125.73, 5.55625, -18.3515),
        (125.73, 5.55625, -37.5285),
        (-44.45, 5.55625, 31.877),
        (-120.65, 5.55625, 38.5445),
        (-44.45, 5.55625, 45.212),
        (31.75, 5.55625, 38.5445),
        (0, 8.255, 49.022),
        (171.1325, 5.55625, -30.48),
        (171.1325, 5.55625, -11.303),
        (171.1325, 5.55625, 7.747),
        (171.1325, 5.55625, 26.797),
    ]]
    fillet(fillet2_edges, radius=FILLET2_R)

    # Chamfer1
    chamfer1_edges = [part.edges().sort_by_distance(p)[0] for p in [
        (0, 5.55625, -51.2445),
    ]]
    chamfer1_side = [part.faces().sort_by_distance(p)[0] for p in [
        (0, 0.619125, -51.2445),
    ]]
    chamfer(chamfer1_edges, length=CHAMFER1_SIZE, length2=CHAMFER1_SIZE2, reference=chamfer1_side[0])


solid = part.part
